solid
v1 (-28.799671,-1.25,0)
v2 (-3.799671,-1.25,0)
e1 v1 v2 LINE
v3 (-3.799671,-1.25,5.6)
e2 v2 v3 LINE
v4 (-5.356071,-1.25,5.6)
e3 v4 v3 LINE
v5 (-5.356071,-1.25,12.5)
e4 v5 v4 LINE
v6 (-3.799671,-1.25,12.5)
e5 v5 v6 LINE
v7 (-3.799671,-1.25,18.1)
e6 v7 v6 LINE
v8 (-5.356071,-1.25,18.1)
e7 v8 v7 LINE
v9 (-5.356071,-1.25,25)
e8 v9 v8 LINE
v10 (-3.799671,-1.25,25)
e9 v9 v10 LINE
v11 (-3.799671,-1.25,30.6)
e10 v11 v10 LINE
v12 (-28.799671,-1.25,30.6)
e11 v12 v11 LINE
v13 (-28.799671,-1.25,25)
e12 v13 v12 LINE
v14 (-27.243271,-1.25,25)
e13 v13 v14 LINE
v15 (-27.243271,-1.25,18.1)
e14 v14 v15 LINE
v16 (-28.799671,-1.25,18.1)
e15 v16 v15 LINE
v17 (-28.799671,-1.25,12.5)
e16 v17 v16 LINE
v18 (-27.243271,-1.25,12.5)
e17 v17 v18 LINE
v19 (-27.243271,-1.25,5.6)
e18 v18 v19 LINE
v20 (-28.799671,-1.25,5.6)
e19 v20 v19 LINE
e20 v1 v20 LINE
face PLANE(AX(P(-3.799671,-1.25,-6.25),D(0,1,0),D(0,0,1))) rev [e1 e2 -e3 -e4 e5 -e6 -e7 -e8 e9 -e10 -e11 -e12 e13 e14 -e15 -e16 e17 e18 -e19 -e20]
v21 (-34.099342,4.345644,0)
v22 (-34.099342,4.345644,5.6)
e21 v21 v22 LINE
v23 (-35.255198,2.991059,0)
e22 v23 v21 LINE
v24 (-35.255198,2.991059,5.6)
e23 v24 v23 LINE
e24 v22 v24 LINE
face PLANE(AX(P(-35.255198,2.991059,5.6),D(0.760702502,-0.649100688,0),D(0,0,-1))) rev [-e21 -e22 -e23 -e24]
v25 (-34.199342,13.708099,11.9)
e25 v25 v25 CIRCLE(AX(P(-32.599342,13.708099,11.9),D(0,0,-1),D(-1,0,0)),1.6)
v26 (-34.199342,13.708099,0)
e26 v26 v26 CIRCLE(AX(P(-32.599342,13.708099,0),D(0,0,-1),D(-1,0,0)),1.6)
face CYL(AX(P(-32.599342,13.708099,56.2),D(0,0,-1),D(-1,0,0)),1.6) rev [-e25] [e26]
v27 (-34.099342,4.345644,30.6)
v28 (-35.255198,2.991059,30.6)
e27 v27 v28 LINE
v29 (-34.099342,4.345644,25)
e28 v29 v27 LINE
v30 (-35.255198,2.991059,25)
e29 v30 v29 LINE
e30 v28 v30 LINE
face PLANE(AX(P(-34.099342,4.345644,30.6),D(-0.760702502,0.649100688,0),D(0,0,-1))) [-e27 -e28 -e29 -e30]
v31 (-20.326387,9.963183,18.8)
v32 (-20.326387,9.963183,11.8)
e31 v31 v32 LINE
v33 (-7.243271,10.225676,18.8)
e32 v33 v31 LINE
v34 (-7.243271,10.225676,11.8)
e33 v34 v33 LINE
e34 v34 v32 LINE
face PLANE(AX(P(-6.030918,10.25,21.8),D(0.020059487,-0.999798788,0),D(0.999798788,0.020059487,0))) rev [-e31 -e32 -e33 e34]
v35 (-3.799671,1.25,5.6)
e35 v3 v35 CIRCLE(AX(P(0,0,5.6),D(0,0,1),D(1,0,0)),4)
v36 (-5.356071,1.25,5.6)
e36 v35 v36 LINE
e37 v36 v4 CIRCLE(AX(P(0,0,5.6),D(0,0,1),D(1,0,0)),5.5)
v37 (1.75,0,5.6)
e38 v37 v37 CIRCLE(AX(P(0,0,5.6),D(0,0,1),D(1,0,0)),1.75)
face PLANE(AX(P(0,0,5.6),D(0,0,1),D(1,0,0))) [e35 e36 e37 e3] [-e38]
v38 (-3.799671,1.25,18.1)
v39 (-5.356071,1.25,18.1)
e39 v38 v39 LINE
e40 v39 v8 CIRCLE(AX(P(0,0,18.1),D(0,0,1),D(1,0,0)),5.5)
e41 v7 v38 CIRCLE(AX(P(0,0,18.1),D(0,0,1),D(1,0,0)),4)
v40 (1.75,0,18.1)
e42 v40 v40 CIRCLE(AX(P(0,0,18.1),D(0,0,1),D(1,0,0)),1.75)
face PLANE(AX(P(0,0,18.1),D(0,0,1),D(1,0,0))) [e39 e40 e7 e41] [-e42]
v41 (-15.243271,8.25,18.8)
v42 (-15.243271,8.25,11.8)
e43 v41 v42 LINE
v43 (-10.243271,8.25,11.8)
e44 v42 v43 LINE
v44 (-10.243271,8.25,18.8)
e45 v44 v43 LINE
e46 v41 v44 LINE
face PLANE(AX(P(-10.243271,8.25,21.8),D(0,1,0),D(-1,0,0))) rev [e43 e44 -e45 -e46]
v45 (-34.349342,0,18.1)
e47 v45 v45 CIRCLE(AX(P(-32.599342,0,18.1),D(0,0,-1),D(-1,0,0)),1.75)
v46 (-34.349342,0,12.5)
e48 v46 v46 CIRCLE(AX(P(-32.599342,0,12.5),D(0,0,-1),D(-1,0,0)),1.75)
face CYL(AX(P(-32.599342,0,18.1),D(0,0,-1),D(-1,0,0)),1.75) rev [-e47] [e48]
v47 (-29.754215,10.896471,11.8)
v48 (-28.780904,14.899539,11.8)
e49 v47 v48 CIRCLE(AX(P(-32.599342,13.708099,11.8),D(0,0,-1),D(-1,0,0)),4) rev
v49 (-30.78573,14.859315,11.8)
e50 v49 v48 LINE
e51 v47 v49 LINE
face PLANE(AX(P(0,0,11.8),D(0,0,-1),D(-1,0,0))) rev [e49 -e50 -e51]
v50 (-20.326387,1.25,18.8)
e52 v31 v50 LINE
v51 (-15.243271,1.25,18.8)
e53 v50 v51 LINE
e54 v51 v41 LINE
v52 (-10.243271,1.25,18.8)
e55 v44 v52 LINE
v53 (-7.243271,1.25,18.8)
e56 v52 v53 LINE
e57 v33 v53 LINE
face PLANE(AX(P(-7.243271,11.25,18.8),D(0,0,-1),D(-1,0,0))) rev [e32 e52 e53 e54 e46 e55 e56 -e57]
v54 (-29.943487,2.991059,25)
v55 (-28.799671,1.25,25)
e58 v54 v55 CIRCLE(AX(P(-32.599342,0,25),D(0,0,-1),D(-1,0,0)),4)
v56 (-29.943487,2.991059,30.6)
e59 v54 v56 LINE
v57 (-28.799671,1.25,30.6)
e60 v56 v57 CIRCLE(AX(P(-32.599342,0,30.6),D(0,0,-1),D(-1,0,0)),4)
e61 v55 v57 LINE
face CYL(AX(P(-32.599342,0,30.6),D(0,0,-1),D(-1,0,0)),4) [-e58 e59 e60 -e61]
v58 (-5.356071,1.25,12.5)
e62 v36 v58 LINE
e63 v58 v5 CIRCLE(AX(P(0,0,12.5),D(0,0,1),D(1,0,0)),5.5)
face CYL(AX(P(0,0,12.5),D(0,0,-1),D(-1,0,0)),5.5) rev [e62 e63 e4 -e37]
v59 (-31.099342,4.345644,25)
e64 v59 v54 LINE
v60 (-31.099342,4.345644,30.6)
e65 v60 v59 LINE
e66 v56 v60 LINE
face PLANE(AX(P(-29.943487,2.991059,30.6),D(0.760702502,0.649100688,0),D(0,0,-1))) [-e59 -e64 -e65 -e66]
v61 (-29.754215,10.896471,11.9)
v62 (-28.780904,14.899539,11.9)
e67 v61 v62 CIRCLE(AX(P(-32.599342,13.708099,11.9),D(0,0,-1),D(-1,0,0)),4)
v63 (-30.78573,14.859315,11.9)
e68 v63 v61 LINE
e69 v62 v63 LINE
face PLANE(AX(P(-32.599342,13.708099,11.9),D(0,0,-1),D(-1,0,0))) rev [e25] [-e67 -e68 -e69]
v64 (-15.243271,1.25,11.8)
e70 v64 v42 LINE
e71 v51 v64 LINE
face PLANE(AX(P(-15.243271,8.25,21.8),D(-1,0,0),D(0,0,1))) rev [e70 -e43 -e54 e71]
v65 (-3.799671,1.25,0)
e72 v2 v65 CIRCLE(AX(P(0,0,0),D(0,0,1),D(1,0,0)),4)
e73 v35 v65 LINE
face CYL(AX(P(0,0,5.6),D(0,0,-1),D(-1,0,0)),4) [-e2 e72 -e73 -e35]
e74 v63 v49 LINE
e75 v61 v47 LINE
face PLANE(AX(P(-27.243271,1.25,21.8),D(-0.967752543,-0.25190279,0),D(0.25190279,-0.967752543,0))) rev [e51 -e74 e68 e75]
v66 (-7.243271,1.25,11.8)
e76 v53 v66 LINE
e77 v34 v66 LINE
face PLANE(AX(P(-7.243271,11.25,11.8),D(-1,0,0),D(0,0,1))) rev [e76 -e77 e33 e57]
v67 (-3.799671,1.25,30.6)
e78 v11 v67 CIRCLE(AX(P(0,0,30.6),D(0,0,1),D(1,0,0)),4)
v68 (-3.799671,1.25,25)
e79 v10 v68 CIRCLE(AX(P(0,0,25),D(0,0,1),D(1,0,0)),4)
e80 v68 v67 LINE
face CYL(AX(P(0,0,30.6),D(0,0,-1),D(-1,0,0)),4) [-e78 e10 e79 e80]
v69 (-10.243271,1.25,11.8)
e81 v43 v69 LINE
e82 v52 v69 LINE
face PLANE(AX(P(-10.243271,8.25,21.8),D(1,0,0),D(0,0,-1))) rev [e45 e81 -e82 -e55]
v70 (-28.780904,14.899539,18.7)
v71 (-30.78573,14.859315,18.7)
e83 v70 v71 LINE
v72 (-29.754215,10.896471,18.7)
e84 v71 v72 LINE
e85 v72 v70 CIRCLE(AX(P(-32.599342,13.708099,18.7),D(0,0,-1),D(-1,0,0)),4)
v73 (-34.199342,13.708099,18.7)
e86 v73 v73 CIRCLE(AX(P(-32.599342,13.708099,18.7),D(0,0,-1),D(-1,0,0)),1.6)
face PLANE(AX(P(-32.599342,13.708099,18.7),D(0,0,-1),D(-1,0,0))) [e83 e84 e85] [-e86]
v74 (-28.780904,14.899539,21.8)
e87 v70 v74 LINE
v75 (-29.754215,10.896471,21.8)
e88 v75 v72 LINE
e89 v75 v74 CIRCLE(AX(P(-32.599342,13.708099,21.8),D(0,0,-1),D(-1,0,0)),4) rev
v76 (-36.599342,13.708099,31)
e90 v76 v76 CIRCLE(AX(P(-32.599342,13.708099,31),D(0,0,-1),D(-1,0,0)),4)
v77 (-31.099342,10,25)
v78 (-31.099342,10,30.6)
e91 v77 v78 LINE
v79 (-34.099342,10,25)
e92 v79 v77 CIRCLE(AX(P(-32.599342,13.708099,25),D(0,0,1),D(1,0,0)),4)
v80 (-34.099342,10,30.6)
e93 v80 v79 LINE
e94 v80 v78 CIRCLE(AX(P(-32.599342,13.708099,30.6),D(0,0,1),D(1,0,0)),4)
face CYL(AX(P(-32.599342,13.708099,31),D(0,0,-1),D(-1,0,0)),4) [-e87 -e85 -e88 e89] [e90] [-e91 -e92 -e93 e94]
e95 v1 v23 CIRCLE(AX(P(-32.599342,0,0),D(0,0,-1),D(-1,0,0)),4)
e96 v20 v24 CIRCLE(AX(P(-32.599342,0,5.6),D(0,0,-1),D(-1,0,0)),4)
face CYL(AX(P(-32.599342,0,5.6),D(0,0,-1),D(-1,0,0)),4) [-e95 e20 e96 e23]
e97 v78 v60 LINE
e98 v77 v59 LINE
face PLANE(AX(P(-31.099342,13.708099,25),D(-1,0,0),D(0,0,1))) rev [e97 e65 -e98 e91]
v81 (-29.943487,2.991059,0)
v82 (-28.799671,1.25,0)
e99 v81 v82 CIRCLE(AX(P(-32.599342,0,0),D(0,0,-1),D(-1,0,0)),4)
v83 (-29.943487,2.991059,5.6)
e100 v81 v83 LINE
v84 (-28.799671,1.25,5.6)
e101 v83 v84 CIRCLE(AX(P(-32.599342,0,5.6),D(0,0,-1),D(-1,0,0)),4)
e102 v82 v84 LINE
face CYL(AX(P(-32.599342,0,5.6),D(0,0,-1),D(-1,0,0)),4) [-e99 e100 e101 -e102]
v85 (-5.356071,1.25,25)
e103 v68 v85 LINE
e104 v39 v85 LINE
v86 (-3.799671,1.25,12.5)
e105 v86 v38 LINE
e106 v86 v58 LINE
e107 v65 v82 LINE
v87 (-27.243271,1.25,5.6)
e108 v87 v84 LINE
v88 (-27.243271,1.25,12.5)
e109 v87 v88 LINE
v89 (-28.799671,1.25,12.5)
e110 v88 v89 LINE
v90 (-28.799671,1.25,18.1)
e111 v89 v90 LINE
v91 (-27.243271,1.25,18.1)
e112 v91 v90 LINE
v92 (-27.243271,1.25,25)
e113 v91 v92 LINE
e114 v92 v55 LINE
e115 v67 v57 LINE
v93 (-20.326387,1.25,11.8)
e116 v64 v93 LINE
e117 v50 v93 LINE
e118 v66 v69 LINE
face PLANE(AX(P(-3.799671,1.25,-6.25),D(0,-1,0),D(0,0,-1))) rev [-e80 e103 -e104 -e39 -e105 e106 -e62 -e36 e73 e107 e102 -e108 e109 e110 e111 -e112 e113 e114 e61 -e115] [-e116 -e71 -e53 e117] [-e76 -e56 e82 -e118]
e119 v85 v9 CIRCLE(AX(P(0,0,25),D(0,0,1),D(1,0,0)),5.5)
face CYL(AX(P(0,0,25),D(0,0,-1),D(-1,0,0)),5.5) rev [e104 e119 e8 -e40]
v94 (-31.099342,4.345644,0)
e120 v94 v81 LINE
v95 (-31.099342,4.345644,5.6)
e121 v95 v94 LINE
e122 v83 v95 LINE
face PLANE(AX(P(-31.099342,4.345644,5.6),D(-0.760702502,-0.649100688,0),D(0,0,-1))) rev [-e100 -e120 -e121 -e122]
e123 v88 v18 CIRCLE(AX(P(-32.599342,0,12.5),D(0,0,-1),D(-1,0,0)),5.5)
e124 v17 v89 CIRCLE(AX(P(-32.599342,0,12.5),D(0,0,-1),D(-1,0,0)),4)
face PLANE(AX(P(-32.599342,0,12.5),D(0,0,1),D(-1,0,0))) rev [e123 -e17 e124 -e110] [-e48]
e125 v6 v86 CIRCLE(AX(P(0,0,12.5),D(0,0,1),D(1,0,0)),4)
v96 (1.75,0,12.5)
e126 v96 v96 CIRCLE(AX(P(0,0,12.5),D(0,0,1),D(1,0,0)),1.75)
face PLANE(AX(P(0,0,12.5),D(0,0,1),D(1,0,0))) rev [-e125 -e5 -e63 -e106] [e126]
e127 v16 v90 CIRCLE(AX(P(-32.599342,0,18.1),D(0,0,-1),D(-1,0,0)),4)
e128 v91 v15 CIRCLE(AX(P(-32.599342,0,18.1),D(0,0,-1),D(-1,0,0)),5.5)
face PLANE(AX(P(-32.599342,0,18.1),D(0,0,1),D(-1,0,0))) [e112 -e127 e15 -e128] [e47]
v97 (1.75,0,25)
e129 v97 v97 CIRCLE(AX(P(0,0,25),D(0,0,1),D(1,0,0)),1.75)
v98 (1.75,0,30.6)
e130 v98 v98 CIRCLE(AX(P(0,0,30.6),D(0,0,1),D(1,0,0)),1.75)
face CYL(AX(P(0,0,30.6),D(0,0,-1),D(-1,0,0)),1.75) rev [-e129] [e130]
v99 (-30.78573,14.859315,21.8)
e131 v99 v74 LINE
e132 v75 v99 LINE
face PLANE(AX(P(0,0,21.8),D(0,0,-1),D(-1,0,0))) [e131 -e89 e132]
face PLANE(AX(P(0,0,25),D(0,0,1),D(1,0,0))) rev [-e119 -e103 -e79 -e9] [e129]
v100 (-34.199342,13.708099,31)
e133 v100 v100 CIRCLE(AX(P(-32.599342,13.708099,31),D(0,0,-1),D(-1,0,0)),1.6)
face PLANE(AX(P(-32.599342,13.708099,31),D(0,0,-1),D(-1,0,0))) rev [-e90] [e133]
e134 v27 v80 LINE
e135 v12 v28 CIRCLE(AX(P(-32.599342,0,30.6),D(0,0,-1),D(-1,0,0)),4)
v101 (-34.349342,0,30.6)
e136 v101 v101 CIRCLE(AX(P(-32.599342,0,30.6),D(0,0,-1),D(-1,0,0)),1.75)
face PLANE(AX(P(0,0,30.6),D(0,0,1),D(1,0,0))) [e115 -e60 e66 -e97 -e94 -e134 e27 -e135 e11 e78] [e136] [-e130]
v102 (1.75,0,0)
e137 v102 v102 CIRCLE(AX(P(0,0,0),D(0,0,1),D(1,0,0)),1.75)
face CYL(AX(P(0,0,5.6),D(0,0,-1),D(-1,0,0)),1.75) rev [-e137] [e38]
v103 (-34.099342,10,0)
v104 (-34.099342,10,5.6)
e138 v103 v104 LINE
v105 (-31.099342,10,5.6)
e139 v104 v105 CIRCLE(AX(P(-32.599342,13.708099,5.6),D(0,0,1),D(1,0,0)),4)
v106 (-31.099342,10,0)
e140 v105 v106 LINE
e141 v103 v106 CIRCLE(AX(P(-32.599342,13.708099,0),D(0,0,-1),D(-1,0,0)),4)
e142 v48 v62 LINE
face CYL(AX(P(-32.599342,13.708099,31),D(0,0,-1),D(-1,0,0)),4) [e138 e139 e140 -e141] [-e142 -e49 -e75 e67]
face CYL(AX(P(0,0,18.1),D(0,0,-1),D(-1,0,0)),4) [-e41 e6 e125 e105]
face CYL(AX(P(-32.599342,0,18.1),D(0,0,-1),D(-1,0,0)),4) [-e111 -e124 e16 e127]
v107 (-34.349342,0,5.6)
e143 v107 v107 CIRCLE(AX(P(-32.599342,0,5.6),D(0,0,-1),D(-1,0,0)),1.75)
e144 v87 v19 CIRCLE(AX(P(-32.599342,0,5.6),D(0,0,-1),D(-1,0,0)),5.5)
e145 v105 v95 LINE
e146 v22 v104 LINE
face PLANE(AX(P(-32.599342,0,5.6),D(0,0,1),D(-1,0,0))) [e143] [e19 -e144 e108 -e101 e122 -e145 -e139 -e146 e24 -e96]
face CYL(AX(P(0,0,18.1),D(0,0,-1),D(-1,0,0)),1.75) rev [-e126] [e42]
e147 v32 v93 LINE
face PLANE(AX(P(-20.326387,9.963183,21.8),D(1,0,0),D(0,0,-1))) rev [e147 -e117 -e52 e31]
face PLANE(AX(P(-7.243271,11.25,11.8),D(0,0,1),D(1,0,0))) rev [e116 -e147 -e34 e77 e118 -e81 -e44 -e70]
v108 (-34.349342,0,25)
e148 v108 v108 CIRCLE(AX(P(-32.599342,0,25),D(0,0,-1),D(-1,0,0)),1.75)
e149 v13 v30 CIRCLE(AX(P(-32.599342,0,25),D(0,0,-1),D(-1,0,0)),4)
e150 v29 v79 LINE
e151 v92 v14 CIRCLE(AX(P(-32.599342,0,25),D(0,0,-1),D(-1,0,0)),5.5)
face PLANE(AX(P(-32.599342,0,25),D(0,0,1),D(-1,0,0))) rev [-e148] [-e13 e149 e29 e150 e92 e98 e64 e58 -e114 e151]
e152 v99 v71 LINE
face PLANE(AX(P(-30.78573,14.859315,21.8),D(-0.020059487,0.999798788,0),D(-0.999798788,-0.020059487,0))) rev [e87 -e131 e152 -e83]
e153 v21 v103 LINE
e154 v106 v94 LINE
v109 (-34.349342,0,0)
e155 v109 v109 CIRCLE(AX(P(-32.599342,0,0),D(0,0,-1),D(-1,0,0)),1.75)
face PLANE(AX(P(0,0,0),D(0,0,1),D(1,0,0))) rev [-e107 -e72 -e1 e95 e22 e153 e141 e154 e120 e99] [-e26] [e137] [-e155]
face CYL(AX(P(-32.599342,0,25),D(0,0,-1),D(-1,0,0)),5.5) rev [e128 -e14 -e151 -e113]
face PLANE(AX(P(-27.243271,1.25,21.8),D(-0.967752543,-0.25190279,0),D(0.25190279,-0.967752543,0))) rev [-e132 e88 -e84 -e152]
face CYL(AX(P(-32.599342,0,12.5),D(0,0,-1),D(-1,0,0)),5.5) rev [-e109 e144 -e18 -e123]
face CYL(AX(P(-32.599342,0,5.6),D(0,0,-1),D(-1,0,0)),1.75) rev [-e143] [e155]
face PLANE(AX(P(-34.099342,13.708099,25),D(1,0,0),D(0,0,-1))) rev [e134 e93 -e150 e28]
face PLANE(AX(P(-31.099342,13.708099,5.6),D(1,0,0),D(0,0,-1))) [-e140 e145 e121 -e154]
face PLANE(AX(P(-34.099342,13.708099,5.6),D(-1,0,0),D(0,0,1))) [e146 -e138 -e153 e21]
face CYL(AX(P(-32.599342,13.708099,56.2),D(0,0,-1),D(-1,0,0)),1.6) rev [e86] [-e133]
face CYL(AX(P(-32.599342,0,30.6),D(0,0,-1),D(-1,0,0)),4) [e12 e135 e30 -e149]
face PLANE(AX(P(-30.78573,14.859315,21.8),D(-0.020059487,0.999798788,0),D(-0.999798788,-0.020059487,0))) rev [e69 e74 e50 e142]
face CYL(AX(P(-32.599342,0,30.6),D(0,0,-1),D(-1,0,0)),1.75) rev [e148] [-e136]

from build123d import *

# Parameters (mm, degrees)
SKETCH_2_R                   = 4
SKETCH_2_R_2                 = 1.75
EXTRUDE_1_DEPTH              = 5.6
PATTERN_LINEAR_1_COUNT       = 3
PATTERN_LINEAR_1_PITCH       = 12.5
EXTRUDE_2_DEPTH              = 6.25
EXTRUDE_2_DEPTH_BACK         = 37.25
SKETCH_3_W                   = 25
SKETCH_3_H                   = 2.5
SKETCH_4_R                   = 5.5
CUT_EXTRUDE_1_DEPTH          = 6.9
PATTERN_LINEAR_2_COUNT       = 4
PATTERN_LINEAR_2_PITCH       = 12.5
PATTERN_LINEAR_4_COUNT       = 2
PATTERN_LINEAR_4_PITCH       = 12.5
PATTERN_START                = 12.5
PATTERN_LINEAR_3_OUTLINE_R   = 1.75
PATTERN_LINEAR_3_DEPTH       = 5.6
PATTERN_START_2              = 25
PATTERN_LINEAR_3_2_OUTLINE_R = 1.75
PATTERN_LINEAR_3_2_DEPTH     = 5.6
MIRROR_3_COPY_1_SKETCH_R     = 5.5
MIRROR_3_COPY_1_DEPTH        = 6.9
MIRROR_3_COPY_2_SKETCH_R     = 5.5
MIRROR_3_COPY_2_DEPTH        = 6.9
MIRROR_3_COPY_3_SKETCH_R     = 5.5
MIRROR_3_COPY_3_DEPTH        = 6.9
MIRROR_3_COPY_4_SKETCH_R     = 5.5
MIRROR_3_COPY_4_DEPTH        = 6.9
SKETCH_5_W                   = 3
SKETCH_5_H                   = 10
EXTRUDE_3_DEPTH              = 5.6
EXTRUDE_4_DEPTH              = 25
EXTRUDE_4_DEPTH_BACK         = 6
SKETCH_6_R                   = 4
SKETCH_7_W                   = 20
SKETCH_7_H                   = 7
EXTRUDE_5_DEPTH              = 10
SKETCH_8_W                   = 5
SKETCH_8_H                   = 7
CUT_EXTRUDE_2_DEPTH          = 10
SKETCH_12_W                  = 25.926545396
SKETCH_12_H                  = 6.65
SKETCH_12_W_2                = 26.106427018
SKETCH_12_H_2                = 6.25
CUT_EXTRUDE_5_DEPTH          = 10
CUT_EXTRUDE_6_DEPTH          = 3.4
CUT_EXTRUDE_6_DEPTH_BACK     = 3.4
SKETCH_13_R                  = 4
SKETCH_14_R                  = 1.6
CUT_EXTRUDE_7_DEPTH          = 56.2


# Read off the part's stored shape, not the designer's step: Линейный массив3
with BuildPart() as part:
    # Эскиз2 → Бобышка-Вытянуть1 (new body)
    with BuildSketch(Plane.XY):
        Circle(SKETCH_2_R)
        Circle(SKETCH_2_R_2, mode=Mode.SUBTRACT)
    extrude_1 = extrude(amount=EXTRUDE_1_DEPTH)


with BuildPart() as pattern_linear_1_1:
    # Линейный массив1: pattern copy
    add(part.part.moved(Location(Vector(0, 0, 1) * (1 * PATTERN_LINEAR_1_PITCH))))


with BuildPart() as pattern_linear_1_2:
    # Линейный массив1: pattern copy
    add(part.part.moved(Location(Vector(0, 0, 1) * (2 * PATTERN_LINEAR_1_PITCH))))


with BuildPart() as part_1:
    add(part.part)

    add(pattern_linear_1_1.part)  # Бобышка-Вытянуть2 merges Линейный массив1_1

    add(pattern_linear_1_2.part)  # Бобышка-Вытянуть2 merges Линейный массив1_2
    # Эскиз3 → Бобышка-Вытянуть2 (add, two sides: drawn at the far end of the back side and taken through both)
    with BuildSketch(Plane(origin=(0, 0, 0), x_dir=(-1, 0, 0), z_dir=(0, 0, -1)).offset(-EXTRUDE_2_DEPTH_BACK)):
        with Locations((16.299671038, 0)):
            Rectangle(SKETCH_3_W, SKETCH_3_H)
    extrude(amount=EXTRUDE_2_DEPTH + EXTRUDE_2_DEPTH_BACK)

    # Эскиз4 → Вырез-Вытянуть1 (cut)
    with BuildSketch(Plane.XY.offset(5.6)):
        Circle(SKETCH_4_R)
    cut_extrude_1 = extrude(amount=CUT_EXTRUDE_1_DEPTH, mode=Mode.SUBTRACT)

    # Линейный массив2: Вырез-Вытянуть1 ×4
    with Locations(*[(0, 0, i * PATTERN_LINEAR_2_PITCH) for i in range(1, PATTERN_LINEAR_2_COUNT)]):
        add(cut_extrude_1, mode=Mode.SUBTRACT)

    # Линейный массив4: Вырез-Вытянуть1 ×2
    with Locations(*[(0, 0, -i * PATTERN_LINEAR_4_PITCH) for i in range(1, PATTERN_LINEAR_4_COUNT)]):
        add(cut_extrude_1, mode=Mode.SUBTRACT)

    # Зеркальное отражение1: Бобышка-Вытянуть1 across plane
    add(extrude_1.mirror(Plane.ZY.offset(16.299671038)))

    # Линейный массив3 outline → Линейный массив3 (add)
    with BuildSketch(Plane.XY.offset(PATTERN_START)):
        with BuildLine():
            ThreePointArc((-28.799671038, 1.25), (-36.599342077, 0), (-28.799671038, -1.25))
            Line((-28.799671038, -1.25), (-28.799671038, 1.25))
        make_face()
        with Locations((-32.599342077, 0)):
            Circle(PATTERN_LINEAR_3_OUTLINE_R, mode=Mode.SUBTRACT)
    extrude(amount=PATTERN_LINEAR_3_DEPTH)

    # Pattern Linear 3 2 outline → Pattern Linear 3 2 (add)
    with BuildSketch(Plane.XY.offset(PATTERN_START_2)):
        with BuildLine():
            ThreePointArc((-28.799671038, 1.25), (-36.599342077, 0), (-28.799671038, -1.25))
            Line((-28.799671038, -1.25), (-28.799671038, 1.25))
        make_face()
        with Locations((-32.599342077, 0)):
            Circle(PATTERN_LINEAR_3_2_OUTLINE_R, mode=Mode.SUBTRACT)
    extrude(amount=PATTERN_LINEAR_3_2_DEPTH)

    # Зеркальное отражение3: Вырез-Вытянуть1 across plane
    add(cut_extrude_1.mirror(Plane.ZY.offset(16.299671038)), mode=Mode.SUBTRACT)

    # Зеркальное отражение3 copy 1 sketch → Зеркальное отражение3 copy 1 (cut)
    with BuildSketch(Plane(origin=(-32.599342077, 0, 18.1), x_dir=(-1, 0, 0), z_dir=(0, 0, 1))):
        Circle(MIRROR_3_COPY_1_SKETCH_R)
    extrude(amount=MIRROR_3_COPY_1_DEPTH, mode=Mode.SUBTRACT)

    # Зеркальное отражение3 copy 2 sketch → Зеркальное отражение3 copy 2 (cut)
    with BuildSketch(Plane(origin=(-32.599342077, 0, 30.6), x_dir=(-1, 0, 0), z_dir=(0, 0, 1))):
        Circle(MIRROR_3_COPY_2_SKETCH_R)
    extrude(amount=MIRROR_3_COPY_2_DEPTH, mode=Mode.SUBTRACT)

    # Зеркальное отражение3 copy 3 sketch → Зеркальное отражение3 copy 3 (cut)
    with BuildSketch(Plane(origin=(-32.599342077, 0, 43.1), x_dir=(-1, 0, 0), z_dir=(0, 0, 1))):
        Circle(MIRROR_3_COPY_3_SKETCH_R)
    extrude(amount=MIRROR_3_COPY_3_DEPTH, mode=Mode.SUBTRACT)

    # Зеркальное отражение3 copy 4 sketch → Зеркальное отражение3 copy 4 (cut)
    with BuildSketch(Plane(origin=(-32.599342077, 0, -6.9), x_dir=(-1, 0, 0), z_dir=(0, 0, 1))):
        Circle(MIRROR_3_COPY_4_SKETCH_R)
    extrude(amount=MIRROR_3_COPY_4_DEPTH, mode=Mode.SUBTRACT)

    # Эскиз5 → Бобышка-Вытянуть3 (add)
    with BuildSketch(Plane(origin=(0, 0, 0), x_dir=(-1, 0, 0), z_dir=(0, 0, -1))):
        with Locations((32.599342077, 8.708099244)):
            Rectangle(SKETCH_5_W, SKETCH_5_H)
    extrude_3 = extrude(amount=-EXTRUDE_3_DEPTH)

    # Зеркальное отражение4: Бобышка-Вытянуть3 across plane
    add(extrude_3.mirror(Plane(origin=(0, 0, 15.3), x_dir=(1, 0, 0), z_dir=(0, 0, -1))))

    # Эскиз6 → Бобышка-Вытянуть4 (add, two sides: drawn at the far end of the back side and taken through both)
    with BuildSketch(Plane(origin=(0, 0, 25), x_dir=(-1, 0, 0), z_dir=(0, 0, -1)).offset(-EXTRUDE_4_DEPTH_BACK)):
        with Locations((32.599342077, 13.708099244)):
            Circle(SKETCH_6_R)
    extrude(amount=EXTRUDE_4_DEPTH + EXTRUDE_4_DEPTH_BACK)

    # Эскиз7 → Бобышка-Вытянуть5 (add)
    with BuildSketch(Plane(origin=(0, 1.25, 0), x_dir=(1, 0, 0), z_dir=(0, 1, 0))):
        with Locations((-17.243270755, -15.3)):
            Rectangle(SKETCH_7_W, SKETCH_7_H)
    extrude(amount=EXTRUDE_5_DEPTH)

    # Эскиз8 → Вырез-Вытянуть2 (cut)
    with BuildSketch(Plane(origin=(0, 0, 11.8), x_dir=(-1, 0, 0), z_dir=(0, 0, -1))):
        Polygon((6.030917846, 10.25), (20.326387044, 9.963182504), (20.326387044, 1.25), (27.243270755, 1.25), (30.785730431, 14.859314756), (3.995086375, 15.396829498), align=None)
        with Locations((12.743270755, 4.75)):
            Rectangle(SKETCH_8_W, SKETCH_8_H)
    extrude(amount=-CUT_EXTRUDE_2_DEPTH, mode=Mode.SUBTRACT)

    # Эскиз12 → Вырез-Вытянуть5 (cut)
    with BuildSketch(Plane(origin=(0, 1.25, 0), x_dir=(1, 0, 0), z_dir=(0, 1, 0))):
        with Locations((-16.867780953, -33.925)):
            Rectangle(SKETCH_12_W, SKETCH_12_H)
        with Locations((-16.852884547, 3.125)):
            Rectangle(SKETCH_12_W_2, SKETCH_12_H_2)
    extrude(amount=-CUT_EXTRUDE_5_DEPTH, mode=Mode.SUBTRACT)

    # Эскиз13 → Вырез-Вытянуть6 (cut, two sides: drawn at the far end of the back side and taken through both)
    with BuildSketch(Plane(origin=(0, 0, 15.3), x_dir=(-1, 0, 0), z_dir=(0, 0, -1)).offset(-CUT_EXTRUDE_6_DEPTH_BACK)):
        with Locations((32.599342077, 13.708099244)):
            Circle(SKETCH_13_R)
    extrude(amount=CUT_EXTRUDE_6_DEPTH + CUT_EXTRUDE_6_DEPTH_BACK, mode=Mode.SUBTRACT)

    # Эскиз14 → Вырез-Вытянуть7 (cut)
    with BuildSketch(Plane(origin=(0, 0, 0), x_dir=(-1, 0, 0), z_dir=(0, 0, -1))):
        with Locations((32.599342077, 13.708099244)):
            Circle(SKETCH_14_R)
    extrude(amount=-CUT_EXTRUDE_7_DEPTH, mode=Mode.SUBTRACT)

    # Фаска1
    # the kernel refuses this chamfer: 1.81151278, 1 mm, written as the material it adds along each edge
    with BuildSketch(Plane(origin=(-31.099342077, 3.708099244, 0), x_dir=(0.8415361936638334, -0.540200735610187, 0), z_dir=(0, 0, 1))) as chamfer_1_piece_1:
        with BuildLine():
            Line((1.429397457, 0), (-0.413759333, 0.557495143))
            Line((-0.413759333, 0.557495143), (-0.444248404, 0.537923532))
            ThreePointArc((-0.444248404, 0.537923532), (-0.217578261, 0.271879907), (-0.030489071, -0.019571611))
            Line((-0.030489071, -0.019571611), (0.006709967, -0.03560348))
            ThreePointArc((0.006709967, -0.03560348), (0.714480275, 0.032881444), (1.423788773, -0.035793492))
            Line((1.423788773, -0.035793492), (1.429397457, 0))
        make_face()
    extrude(amount=5.6)
    with BuildSketch(Plane(origin=(-34.099342077, 3.708099244, 0), x_dir=(-0.8415361936638353, -0.5402007356101841, 0), z_dir=(0, 0, 1))) as chamfer_1_piece_2:
        with BuildLine():
            Line((1.429397457, 0), (-0.413759333, -0.557495143))
            Line((-0.413759333, -0.557495143), (-0.444248404, -0.537923532))
            ThreePointArc((-0.444248404, -0.537923532), (-0.217578261, -0.271879907), (-0.030489071, 0.019571611))
            Line((-0.030489071, 0.019571611), (0.006709967, 0.03560348))
            ThreePointArc((0.006709967, 0.03560348), (0.714480275, -0.032881444), (1.423788773, 0.035793492))
            Line((1.423788773, 0.035793492), (1.429397457, 0))
        make_face()
    extrude(amount=5.6)
    with BuildSketch(Plane(origin=(-31.099342077, 3.708099244, 30.6), x_dir=(0.8415361938100423, -0.5402007353824197, 0), z_dir=(0, 0, -1))) as chamfer_1_piece_3:
        with BuildLine():
            Line((1.429397457, 0), (-0.413759333, -0.557495144))
            Line((-0.413759333, -0.557495144), (-0.444248404, -0.537923533))
            ThreePointArc((-0.444248404, -0.537923533), (-0.217578261, -0.271879907), (-0.030489071, 0.019571611))
            Line((-0.030489071, 0.019571611), (0.006709967, 0.03560348))
            ThreePointArc((0.006709967, 0.03560348), (0.714480275, -0.032881444), (1.423788773, 0.035793492))
            Line((1.423788773, 0.035793492), (1.429397457, 0))
        make_face()
    extrude(amount=5.6)
    with BuildSketch(Plane(origin=(-34.099342077, 3.708099244, 30.6), x_dir=(-0.8415361937600511, -0.5402007354602969, 0), z_dir=(0, 0, -1))) as chamfer_1_piece_4:
        with BuildLine():
            Line((1.429397457, 0), (-0.413759333, 0.557495144))
            Line((-0.413759333, 0.557495144), (-0.444248404, 0.537923533))
            ThreePointArc((-0.444248404, 0.537923533), (-0.217578261, 0.271879907), (-0.030489071, -0.019571611))
            Line((-0.030489071, -0.019571611), (0.006709967, -0.03560348))
            ThreePointArc((0.006709967, -0.03560348), (0.714480275, 0.032881444), (1.423788773, -0.035793492))
            Line((1.423788773, -0.035793492), (1.429397457, 0))
        make_face()
    extrude(amount=5.6)


solid = part_1.part
